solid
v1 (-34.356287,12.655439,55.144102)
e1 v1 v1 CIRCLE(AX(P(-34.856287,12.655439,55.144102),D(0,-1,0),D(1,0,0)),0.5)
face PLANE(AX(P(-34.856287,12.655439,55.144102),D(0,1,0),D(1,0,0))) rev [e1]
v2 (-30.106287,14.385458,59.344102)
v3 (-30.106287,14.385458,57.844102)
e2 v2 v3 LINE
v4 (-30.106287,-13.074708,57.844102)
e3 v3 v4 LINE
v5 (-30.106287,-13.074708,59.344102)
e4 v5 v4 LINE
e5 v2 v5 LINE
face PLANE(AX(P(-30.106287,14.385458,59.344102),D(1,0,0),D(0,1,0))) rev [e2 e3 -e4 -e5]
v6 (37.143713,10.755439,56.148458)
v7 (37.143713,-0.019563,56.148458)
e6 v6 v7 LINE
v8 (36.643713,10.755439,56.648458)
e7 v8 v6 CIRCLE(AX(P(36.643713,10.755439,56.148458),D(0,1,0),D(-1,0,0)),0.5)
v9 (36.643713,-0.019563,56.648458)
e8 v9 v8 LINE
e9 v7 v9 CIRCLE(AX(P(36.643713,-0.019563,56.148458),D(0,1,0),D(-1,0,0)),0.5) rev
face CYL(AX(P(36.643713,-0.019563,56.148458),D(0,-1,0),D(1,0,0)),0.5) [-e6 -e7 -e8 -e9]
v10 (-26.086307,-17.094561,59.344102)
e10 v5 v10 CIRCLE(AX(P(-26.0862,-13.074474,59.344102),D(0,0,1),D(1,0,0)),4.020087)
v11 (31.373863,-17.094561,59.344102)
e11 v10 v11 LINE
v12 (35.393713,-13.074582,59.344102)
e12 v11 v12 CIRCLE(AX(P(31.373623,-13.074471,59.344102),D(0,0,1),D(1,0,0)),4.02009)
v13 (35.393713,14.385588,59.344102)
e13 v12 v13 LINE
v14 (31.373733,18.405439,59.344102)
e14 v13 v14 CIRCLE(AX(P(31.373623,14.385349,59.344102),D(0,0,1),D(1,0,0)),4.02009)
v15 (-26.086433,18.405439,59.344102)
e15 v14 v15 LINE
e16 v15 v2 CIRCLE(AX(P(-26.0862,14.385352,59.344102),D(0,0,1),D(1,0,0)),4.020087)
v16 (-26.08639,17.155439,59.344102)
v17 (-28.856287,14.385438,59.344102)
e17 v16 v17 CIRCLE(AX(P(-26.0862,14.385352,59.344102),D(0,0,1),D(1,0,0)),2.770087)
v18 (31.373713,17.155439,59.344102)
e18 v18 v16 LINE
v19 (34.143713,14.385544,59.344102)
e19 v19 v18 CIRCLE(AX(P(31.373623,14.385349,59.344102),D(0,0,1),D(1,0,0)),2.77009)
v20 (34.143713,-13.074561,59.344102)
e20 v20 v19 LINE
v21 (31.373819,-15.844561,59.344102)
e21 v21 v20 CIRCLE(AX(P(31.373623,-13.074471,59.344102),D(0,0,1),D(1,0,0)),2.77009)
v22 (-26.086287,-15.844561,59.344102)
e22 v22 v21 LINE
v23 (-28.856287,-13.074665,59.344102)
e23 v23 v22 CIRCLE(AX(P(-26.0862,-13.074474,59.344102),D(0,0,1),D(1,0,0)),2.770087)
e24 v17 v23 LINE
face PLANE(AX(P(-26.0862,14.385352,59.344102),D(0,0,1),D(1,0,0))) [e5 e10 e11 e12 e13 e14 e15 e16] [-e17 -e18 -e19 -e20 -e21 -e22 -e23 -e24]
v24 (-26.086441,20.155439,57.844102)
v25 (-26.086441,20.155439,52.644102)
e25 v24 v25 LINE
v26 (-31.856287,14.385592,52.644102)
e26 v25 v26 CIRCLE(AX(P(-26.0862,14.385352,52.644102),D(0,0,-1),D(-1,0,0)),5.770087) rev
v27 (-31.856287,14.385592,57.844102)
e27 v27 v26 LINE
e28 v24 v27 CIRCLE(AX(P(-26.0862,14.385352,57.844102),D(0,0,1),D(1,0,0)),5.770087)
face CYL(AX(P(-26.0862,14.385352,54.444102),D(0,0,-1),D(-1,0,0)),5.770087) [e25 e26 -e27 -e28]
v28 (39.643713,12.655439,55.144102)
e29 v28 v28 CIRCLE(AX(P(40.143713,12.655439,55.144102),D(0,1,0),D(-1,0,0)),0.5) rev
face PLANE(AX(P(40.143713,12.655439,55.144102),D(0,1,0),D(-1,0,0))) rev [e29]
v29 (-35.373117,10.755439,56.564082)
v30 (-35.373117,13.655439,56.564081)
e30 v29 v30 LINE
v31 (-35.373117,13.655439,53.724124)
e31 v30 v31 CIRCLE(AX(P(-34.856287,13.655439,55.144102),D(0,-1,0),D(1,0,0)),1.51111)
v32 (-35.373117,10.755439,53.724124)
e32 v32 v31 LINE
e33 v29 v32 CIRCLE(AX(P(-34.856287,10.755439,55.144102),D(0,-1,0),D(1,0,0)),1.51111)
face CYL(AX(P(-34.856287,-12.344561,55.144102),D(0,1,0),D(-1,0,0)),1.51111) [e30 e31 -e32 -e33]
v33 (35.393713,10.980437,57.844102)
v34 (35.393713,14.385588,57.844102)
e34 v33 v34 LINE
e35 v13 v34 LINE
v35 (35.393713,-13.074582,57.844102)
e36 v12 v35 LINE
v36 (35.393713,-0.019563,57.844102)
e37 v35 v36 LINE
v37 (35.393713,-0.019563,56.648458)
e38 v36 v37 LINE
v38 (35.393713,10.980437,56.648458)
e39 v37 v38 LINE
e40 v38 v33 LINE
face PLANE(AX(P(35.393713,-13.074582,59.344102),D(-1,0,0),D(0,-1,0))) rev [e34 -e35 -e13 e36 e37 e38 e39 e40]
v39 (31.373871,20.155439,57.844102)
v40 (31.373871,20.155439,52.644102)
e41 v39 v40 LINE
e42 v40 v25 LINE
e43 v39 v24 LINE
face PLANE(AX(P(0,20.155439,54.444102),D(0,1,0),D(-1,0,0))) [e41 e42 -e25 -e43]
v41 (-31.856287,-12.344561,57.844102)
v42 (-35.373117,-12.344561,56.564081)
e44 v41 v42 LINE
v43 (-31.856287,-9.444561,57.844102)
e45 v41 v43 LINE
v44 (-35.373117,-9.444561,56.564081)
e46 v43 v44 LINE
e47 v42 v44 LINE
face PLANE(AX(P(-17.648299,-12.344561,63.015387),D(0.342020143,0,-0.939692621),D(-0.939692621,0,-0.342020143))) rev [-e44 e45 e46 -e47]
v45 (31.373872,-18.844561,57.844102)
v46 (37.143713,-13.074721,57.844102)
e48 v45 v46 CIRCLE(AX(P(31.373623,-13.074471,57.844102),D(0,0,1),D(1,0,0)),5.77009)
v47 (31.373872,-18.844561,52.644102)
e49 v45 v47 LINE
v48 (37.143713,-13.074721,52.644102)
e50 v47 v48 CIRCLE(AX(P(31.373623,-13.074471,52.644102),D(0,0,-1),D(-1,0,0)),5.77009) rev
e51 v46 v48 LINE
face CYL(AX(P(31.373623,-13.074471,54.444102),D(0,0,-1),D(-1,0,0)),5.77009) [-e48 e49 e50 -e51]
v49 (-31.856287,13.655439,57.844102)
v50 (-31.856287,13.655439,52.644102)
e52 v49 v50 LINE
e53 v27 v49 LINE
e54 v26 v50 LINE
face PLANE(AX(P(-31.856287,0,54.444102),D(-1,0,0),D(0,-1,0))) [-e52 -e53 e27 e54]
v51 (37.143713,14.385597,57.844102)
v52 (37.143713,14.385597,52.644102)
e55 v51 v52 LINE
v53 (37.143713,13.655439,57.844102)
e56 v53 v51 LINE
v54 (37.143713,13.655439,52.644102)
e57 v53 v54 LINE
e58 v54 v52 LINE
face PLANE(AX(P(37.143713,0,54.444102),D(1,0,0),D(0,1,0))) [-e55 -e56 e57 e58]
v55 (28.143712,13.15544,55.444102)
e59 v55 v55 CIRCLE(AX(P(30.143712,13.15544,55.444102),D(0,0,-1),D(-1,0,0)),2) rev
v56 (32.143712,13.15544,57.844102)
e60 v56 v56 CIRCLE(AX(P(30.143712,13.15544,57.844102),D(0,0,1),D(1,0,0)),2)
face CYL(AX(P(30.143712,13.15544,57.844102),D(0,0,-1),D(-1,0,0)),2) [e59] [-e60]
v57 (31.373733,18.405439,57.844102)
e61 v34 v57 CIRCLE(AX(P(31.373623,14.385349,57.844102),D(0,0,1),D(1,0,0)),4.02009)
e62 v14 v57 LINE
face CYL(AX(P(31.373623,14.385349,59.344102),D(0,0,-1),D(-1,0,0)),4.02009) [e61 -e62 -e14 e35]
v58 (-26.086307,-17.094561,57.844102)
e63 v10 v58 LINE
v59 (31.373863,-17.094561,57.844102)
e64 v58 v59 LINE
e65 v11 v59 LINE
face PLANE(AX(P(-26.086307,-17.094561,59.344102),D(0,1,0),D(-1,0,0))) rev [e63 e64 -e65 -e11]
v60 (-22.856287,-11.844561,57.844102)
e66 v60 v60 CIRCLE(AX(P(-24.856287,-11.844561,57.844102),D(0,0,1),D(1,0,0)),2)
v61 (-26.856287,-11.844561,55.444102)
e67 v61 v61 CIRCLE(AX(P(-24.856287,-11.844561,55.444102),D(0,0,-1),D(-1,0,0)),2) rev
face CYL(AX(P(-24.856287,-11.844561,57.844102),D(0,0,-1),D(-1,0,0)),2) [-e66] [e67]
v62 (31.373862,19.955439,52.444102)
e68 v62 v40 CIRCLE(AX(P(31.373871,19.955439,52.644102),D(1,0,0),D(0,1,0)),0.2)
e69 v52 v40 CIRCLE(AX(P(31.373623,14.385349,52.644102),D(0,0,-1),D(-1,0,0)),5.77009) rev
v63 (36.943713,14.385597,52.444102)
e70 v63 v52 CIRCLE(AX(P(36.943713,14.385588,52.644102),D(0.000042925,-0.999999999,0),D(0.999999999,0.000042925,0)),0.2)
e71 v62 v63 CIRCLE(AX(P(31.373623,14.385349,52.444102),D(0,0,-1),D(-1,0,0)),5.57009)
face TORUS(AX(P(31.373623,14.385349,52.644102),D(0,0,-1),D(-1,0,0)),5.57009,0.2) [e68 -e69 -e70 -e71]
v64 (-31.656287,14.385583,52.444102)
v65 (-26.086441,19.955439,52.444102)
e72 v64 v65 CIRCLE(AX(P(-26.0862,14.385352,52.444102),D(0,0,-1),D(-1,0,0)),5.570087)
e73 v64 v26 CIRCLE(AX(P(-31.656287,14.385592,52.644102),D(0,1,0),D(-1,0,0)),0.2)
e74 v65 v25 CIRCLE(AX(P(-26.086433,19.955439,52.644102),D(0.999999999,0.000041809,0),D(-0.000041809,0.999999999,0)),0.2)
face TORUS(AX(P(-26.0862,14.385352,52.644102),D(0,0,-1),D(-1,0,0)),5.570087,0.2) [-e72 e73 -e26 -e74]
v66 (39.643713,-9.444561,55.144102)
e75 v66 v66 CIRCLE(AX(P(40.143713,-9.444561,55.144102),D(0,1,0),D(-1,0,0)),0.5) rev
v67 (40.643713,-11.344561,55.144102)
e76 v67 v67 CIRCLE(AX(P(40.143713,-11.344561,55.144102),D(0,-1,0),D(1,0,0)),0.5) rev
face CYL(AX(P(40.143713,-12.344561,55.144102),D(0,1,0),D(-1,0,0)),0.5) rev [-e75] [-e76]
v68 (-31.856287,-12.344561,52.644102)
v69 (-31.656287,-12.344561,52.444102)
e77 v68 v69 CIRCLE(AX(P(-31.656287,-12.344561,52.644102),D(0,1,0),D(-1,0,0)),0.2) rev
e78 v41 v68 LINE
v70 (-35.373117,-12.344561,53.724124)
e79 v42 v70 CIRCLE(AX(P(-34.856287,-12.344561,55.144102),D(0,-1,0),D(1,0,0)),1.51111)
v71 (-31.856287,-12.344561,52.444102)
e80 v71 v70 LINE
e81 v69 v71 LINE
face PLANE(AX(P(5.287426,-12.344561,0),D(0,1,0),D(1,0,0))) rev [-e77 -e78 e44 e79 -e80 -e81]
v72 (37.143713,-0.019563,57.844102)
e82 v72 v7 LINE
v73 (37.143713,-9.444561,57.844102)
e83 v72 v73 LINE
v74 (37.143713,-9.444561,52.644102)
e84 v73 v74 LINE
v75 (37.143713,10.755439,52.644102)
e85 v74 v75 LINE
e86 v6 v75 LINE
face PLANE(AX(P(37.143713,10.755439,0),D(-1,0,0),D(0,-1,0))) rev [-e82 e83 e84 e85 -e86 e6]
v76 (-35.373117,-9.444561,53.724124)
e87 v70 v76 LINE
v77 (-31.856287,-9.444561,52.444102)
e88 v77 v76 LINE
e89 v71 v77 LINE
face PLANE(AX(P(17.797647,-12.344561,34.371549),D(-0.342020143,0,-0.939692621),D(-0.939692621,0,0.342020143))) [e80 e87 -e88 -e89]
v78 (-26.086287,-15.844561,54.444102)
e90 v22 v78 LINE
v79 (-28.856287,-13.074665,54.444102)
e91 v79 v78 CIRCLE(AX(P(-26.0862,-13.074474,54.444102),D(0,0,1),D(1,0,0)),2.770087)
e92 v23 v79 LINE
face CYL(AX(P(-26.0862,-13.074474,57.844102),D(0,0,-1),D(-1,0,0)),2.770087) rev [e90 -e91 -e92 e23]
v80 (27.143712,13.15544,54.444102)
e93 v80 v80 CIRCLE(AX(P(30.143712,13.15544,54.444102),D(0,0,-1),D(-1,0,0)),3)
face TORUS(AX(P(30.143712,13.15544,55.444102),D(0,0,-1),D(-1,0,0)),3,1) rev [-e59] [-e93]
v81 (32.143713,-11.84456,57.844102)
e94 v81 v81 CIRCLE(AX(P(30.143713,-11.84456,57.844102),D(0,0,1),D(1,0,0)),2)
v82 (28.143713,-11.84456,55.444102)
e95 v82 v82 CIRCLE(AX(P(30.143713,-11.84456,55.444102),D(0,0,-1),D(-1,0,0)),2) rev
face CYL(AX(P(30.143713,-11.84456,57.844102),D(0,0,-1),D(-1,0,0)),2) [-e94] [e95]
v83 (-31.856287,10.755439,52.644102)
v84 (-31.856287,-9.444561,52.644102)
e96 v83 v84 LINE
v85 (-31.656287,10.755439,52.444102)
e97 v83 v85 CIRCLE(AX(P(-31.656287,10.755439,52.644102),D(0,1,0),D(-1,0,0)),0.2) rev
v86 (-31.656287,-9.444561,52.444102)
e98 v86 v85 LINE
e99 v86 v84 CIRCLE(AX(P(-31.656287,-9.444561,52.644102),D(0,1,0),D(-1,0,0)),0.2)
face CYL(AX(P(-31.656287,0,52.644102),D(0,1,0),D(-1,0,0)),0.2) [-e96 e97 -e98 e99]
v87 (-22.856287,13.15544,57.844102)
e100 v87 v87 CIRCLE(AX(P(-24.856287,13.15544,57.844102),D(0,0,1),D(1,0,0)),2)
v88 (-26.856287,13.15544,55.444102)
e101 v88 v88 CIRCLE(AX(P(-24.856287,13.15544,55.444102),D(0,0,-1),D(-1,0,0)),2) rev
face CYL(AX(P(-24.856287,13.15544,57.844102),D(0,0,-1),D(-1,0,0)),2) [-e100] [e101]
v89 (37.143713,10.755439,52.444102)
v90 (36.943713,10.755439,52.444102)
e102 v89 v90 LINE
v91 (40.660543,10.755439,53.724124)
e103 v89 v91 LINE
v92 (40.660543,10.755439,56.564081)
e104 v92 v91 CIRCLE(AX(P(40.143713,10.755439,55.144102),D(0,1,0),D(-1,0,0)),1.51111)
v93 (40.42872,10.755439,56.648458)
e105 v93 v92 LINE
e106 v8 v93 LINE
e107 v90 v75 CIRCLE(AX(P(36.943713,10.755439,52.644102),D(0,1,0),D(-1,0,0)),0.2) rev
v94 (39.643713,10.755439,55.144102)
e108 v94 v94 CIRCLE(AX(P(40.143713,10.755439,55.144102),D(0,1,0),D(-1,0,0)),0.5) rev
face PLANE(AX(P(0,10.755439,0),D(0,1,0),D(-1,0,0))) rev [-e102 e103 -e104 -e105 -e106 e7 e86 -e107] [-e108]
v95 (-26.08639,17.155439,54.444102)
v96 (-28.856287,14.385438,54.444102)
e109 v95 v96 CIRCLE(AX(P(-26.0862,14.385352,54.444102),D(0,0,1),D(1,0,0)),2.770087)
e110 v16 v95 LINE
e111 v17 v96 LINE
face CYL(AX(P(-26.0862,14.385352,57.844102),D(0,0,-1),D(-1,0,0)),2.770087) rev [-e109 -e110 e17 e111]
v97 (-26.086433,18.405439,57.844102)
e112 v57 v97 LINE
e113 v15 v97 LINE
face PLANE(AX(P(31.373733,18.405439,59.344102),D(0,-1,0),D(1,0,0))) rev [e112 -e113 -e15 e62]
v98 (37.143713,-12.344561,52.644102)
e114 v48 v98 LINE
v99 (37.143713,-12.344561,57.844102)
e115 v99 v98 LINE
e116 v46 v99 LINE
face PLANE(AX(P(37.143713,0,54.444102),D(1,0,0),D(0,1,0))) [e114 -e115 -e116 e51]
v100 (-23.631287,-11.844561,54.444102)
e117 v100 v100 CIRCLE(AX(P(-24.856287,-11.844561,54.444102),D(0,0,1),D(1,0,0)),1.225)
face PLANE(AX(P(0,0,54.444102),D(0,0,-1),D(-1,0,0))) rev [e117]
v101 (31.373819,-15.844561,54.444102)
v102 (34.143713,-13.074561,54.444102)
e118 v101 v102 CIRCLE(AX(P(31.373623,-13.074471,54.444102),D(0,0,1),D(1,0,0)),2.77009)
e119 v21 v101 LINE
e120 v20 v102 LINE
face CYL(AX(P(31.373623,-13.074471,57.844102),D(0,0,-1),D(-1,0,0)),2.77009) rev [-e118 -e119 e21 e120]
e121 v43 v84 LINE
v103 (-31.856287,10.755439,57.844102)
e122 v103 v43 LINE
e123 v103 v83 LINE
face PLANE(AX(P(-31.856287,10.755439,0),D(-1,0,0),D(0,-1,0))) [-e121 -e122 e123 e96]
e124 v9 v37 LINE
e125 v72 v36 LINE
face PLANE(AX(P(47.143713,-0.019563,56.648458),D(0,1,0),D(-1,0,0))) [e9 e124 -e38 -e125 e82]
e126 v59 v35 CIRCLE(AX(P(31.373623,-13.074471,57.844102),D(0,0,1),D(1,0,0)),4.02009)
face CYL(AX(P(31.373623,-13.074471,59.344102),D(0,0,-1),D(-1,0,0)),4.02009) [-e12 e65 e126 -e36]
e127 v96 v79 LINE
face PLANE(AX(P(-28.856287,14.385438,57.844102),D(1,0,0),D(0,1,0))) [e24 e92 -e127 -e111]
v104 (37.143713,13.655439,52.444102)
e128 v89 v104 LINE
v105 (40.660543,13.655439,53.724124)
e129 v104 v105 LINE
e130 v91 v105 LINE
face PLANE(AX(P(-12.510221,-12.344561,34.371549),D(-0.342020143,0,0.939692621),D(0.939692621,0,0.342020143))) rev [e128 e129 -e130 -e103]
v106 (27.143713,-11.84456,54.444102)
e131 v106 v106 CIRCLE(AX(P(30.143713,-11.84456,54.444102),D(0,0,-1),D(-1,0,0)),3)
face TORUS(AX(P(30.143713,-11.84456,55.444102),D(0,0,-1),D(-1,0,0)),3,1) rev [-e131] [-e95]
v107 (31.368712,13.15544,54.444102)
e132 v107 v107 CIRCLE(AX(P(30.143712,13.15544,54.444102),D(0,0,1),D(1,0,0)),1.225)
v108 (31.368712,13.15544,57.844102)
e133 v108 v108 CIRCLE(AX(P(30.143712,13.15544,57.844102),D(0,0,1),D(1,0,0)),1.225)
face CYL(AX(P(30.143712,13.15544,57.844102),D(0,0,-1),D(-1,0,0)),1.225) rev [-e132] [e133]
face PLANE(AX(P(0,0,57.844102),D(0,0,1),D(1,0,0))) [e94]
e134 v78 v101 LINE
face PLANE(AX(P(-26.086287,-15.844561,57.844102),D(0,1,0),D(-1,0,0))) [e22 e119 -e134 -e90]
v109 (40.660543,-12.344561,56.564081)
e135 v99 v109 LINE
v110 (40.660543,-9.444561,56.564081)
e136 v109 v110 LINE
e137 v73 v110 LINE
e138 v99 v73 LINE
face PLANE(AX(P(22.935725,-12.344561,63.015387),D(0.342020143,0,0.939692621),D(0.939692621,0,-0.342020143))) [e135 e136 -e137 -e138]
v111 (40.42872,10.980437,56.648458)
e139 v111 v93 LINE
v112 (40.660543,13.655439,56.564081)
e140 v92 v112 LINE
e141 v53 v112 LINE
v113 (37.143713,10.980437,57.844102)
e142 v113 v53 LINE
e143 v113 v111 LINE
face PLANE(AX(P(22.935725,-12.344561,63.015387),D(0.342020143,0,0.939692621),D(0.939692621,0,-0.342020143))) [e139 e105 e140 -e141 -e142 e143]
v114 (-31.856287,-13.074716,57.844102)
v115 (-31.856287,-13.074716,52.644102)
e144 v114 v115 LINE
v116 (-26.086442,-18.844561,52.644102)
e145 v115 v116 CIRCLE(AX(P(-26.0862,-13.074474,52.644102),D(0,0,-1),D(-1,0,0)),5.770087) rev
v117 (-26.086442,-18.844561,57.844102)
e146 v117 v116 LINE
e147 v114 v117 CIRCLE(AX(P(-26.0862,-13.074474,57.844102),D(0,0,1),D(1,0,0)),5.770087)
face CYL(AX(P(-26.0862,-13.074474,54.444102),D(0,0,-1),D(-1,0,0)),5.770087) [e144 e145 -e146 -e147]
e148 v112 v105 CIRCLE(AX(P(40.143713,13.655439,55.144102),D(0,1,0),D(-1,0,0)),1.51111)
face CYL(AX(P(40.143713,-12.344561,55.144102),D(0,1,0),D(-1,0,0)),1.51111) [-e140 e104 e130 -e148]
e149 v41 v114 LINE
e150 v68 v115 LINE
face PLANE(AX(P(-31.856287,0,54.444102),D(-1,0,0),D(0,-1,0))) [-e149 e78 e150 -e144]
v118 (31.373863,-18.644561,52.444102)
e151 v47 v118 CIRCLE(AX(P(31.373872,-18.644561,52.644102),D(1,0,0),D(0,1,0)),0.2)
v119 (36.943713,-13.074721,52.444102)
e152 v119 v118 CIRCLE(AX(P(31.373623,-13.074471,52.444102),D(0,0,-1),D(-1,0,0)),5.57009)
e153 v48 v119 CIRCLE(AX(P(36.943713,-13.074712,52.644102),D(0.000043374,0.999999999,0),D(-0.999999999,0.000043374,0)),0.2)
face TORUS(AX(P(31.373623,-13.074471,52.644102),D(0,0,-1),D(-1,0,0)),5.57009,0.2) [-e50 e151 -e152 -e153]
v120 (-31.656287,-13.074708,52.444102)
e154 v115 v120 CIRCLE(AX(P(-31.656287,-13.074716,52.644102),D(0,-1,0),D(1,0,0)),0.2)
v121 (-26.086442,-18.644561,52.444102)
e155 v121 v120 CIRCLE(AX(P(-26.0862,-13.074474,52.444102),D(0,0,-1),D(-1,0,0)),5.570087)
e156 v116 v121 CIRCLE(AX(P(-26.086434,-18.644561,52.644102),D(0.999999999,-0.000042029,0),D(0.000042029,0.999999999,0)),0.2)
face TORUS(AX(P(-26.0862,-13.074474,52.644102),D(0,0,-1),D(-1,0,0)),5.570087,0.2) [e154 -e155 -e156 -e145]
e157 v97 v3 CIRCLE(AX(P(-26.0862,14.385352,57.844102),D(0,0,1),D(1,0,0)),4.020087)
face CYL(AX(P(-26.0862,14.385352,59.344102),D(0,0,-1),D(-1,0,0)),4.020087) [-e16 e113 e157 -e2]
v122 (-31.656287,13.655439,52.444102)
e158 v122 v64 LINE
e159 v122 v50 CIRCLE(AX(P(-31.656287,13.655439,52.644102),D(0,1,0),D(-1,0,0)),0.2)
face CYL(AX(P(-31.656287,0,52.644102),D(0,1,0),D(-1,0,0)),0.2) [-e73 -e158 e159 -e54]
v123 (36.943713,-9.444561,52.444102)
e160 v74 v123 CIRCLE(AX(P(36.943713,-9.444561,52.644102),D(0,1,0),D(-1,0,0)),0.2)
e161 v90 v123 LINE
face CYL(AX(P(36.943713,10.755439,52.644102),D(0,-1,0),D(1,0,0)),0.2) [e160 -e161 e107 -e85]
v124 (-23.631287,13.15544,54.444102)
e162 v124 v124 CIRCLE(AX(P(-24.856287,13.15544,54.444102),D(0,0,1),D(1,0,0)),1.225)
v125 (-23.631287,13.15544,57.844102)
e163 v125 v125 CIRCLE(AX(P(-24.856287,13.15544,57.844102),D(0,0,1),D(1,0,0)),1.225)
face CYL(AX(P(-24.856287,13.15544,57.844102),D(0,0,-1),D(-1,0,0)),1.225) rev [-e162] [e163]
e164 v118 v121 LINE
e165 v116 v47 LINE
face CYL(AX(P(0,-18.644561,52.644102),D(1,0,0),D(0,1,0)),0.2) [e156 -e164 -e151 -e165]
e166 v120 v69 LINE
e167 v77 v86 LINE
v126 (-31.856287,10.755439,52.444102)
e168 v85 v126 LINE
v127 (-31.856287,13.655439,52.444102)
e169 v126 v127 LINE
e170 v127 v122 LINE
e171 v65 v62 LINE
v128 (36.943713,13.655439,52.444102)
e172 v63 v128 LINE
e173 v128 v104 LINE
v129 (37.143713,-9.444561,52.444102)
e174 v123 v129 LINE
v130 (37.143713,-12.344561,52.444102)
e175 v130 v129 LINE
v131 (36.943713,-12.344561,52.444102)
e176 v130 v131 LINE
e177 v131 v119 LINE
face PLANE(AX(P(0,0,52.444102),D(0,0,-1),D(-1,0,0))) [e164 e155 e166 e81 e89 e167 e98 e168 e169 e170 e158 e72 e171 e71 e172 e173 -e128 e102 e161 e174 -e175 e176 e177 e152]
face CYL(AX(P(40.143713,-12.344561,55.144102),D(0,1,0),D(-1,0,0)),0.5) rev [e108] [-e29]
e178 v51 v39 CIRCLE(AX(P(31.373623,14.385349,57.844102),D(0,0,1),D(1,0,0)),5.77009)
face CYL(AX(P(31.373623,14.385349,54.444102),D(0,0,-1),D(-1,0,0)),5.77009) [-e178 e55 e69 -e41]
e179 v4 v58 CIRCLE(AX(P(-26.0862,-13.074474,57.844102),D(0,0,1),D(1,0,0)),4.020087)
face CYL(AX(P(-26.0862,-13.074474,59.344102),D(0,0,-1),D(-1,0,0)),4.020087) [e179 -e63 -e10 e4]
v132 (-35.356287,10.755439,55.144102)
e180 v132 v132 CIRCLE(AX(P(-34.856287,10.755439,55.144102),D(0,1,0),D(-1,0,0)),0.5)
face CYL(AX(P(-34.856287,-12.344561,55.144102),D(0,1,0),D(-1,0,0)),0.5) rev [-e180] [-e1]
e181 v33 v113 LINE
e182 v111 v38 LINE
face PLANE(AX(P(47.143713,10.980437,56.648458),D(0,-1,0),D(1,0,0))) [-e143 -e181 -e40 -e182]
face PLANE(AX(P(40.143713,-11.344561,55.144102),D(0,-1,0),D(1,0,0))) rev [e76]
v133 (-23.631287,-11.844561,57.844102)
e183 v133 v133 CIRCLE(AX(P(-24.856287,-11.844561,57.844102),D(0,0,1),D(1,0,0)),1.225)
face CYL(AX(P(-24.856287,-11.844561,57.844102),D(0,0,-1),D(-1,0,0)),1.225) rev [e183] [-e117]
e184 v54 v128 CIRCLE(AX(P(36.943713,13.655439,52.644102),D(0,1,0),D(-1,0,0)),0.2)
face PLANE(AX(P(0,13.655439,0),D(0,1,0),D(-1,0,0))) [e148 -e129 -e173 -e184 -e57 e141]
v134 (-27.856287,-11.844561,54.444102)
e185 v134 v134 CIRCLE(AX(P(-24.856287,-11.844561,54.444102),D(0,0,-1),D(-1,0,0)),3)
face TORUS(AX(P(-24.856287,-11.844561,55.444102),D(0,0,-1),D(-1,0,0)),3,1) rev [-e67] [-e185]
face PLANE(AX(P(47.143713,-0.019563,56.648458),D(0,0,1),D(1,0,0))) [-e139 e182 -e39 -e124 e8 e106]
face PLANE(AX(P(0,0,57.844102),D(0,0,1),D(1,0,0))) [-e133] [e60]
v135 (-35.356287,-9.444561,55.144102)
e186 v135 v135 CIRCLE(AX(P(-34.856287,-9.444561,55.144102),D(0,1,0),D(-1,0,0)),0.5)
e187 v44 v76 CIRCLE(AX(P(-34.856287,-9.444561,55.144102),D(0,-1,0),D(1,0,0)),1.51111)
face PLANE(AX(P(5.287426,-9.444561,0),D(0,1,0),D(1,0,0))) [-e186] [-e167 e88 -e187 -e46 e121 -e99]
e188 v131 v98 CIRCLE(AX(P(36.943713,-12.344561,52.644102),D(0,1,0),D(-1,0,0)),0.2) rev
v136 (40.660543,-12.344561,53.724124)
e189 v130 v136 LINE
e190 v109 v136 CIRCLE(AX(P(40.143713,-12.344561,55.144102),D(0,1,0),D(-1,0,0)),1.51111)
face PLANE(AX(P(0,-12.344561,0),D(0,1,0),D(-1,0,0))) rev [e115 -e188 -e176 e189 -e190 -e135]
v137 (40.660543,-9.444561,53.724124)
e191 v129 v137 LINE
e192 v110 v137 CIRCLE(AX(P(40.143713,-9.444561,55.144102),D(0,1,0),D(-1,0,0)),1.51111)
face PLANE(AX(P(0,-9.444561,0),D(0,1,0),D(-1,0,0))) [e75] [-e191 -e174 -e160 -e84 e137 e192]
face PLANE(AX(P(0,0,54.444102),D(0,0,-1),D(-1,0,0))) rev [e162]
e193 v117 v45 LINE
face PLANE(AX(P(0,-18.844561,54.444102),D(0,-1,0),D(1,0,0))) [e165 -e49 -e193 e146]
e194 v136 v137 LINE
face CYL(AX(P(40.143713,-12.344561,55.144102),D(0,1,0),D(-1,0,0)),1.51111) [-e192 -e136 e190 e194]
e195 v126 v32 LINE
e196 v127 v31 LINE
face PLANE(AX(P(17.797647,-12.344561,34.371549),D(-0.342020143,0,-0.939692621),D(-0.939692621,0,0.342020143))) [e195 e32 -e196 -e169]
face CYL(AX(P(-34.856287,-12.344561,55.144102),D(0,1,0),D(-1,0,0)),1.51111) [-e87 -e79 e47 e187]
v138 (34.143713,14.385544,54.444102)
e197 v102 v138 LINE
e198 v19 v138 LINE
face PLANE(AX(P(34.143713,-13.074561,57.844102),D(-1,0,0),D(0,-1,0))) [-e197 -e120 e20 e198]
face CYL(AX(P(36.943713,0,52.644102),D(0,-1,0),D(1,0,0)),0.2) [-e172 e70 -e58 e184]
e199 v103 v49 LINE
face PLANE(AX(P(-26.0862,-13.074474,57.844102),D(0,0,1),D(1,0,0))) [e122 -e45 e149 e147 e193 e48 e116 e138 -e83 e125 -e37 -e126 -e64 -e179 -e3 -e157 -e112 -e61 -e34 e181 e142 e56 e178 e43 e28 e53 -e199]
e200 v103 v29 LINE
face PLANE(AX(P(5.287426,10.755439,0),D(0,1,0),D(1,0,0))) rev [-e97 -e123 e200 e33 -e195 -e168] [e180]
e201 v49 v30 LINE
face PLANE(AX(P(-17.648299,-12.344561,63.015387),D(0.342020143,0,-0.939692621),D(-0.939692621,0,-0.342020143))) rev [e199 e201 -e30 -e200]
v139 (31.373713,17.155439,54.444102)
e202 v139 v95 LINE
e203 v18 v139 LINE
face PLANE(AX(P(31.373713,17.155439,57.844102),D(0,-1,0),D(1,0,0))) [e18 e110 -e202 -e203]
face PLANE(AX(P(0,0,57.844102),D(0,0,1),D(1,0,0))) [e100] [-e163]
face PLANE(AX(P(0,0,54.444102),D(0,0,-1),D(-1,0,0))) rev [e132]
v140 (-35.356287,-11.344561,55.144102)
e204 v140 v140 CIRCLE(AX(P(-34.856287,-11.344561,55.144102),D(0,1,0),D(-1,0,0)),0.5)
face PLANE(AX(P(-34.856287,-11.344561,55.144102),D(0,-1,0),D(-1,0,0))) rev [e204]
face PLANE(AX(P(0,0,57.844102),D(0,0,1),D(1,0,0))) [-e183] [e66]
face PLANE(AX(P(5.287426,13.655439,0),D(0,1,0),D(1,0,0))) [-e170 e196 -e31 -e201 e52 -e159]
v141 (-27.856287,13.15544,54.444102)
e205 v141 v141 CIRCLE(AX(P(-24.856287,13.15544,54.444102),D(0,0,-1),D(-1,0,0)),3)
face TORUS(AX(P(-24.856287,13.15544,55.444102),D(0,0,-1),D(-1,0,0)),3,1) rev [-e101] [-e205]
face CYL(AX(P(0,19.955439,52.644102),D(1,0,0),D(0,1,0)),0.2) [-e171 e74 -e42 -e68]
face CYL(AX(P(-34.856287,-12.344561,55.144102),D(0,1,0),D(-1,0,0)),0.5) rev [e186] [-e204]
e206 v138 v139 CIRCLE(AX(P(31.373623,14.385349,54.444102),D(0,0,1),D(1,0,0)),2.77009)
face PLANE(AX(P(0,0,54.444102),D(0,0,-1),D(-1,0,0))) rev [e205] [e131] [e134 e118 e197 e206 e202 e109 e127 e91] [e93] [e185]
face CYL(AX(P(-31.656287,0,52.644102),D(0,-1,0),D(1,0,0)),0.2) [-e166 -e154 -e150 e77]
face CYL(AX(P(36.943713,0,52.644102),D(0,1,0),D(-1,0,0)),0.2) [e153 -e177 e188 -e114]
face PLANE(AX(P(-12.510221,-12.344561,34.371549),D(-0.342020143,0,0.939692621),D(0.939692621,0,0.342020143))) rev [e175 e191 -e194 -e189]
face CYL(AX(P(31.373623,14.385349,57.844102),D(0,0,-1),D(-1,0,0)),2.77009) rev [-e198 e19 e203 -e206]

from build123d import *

# Parameters (mm, degrees)
EXTRUDE_1_DEPTH                 = 2
SKETCH_2_R                      = 2
SKETCH_2_R_2                    = 1.225
EXTRUDE_2_DEPTH                 = 3.4
FILLET_1_R                      = 1
EXTRUDE_3_DEPTH                 = 3.4
EXTRUDE_4_DEPTH                 = 1.5
EXTRUDE_START                   = -13
EXTRUDE_5_OUTLINE_R             = 0.5
EXTRUDE_5_DEPTH                 = 26
SKETCH_7_R                      = 0.5
EXTRUDE_6_DEPTH                 = 1
SKETCH_6_5_R                    = 1.511110367
CUT_EXTRUDE_2_DEPTH             = 10.1
CUT_EXTRUDE_START               = -10.1
CUT_EXTRUDE_3_DEPTH             = 20.2
EXTRUDE_START_2                 = -1
SKETCH_8_R                      = 0.5
EXTRUDE_7_DEPTH                 = 1
FILLET_12_R                     = 0.2
FILLET_13_R                     = 0.2
FILLET_14_R                     = 0.2
FILLET_15_R                     = 0.2
CUT_EXTRUDE_4_REACH             = 98.601
SKETCH_9_W                      = 8
SKETCH_9_H                      = 11
CUT_EXTRUDE_4_DIRECTION_2_DEPTH = 10
FILLET_20_R                     = 0.5


# Read off the part's stored shape, not the designer's step: 填料-伸長5, 除料-伸長3
with BuildPart() as part:
    # 草圖1 → 填料-伸長1 (new body)
    # profile 1 of 2: a face of its own
    with BuildSketch(Plane(origin=(0, 0, 52.444102468), x_dir=(-1, 0, 0), z_dir=(0, 0, -1))):
        with BuildLine():
            Line((-31.373871627, -18.844561135), (26.086442071, -18.844561135))
            ThreePointArc((26.086442071, -18.844561135), (30.166267544, -17.154541644), (31.856287034, -13.074716171))
            Line((31.856287034, -13.074716171), (31.856287035, 14.385591758))
            ThreePointArc((31.856287035, 14.385591758), (30.166268145, 18.465419031), (26.08644126, 20.155438855))
            Line((26.08644126, 20.155438855), (-31.373870816, 20.155438854))
            ThreePointArc((-31.373870816, 20.155438854), (-35.453692779, 18.465418678), (-37.143712955, 14.385596715))
            Line((-37.143712955, 14.385596715), (-37.143712955, -13.074721129))
            ThreePointArc((-37.143712955, -13.074721129), (-35.453692177, -17.154541292), (-31.373871627, -18.844561135))
        make_face()
        with BuildLine():
            ThreePointArc((26.086287059, -14.34456114), (26.984287031, -13.972561131), (27.35628704, -13.074561159))
            Line((27.35628704, -13.074561159), (27.35628704, 14.385438402))
            ThreePointArc((27.35628704, 14.385438402), (26.984287334, 15.283438817), (26.086287059, 15.65543886))
            Line((26.086287059, 15.65543886), (-31.373712502, 15.65543886))
            ThreePointArc((-31.373712502, 15.65543886), (-32.271712266, 15.283438166), (-32.64371296, 14.385438402))
            Line((-32.64371296, 14.385438402), (-32.64371296, -13.074561159))
            ThreePointArc((-32.64371296, -13.074561159), (-32.271711963, -13.97256048), (-31.373712502, -14.34456114))
            Line((-31.373712502, -14.34456114), (26.086287059, -14.34456114))
        make_face(mode=Mode.SUBTRACT)
    # profile 2 of 2: a face of its own
    with BuildSketch(Plane(origin=(0, 0, 52.444102468), x_dir=(-1, 0, 0), z_dir=(0, 0, -1))):
        with BuildLine():
            Line((-31.373712502, -14.34456114), (26.086287059, -14.34456114))
            ThreePointArc((26.086287059, -14.34456114), (26.984287031, -13.972561131), (27.35628704, -13.074561159))
            Line((27.35628704, -13.074561159), (27.35628704, 14.385438402))
            ThreePointArc((27.35628704, 14.385438402), (26.984287334, 15.283438817), (26.086287059, 15.65543886))
            Line((26.086287059, 15.65543886), (-31.373712502, 15.65543886))
            ThreePointArc((-31.373712502, 15.65543886), (-32.271712266, 15.283438166), (-32.64371296, 14.385438402))
            Line((-32.64371296, 14.385438402), (-32.64371296, -13.074561159))
            ThreePointArc((-32.64371296, -13.074561159), (-32.271711963, -13.97256048), (-31.373712502, -14.34456114))
        make_face()
    extrude(amount=-EXTRUDE_1_DEPTH)

    # 草圖2 → 填料-伸長2 (add)
    # profile 1 of 4: a face of its own
    with BuildSketch(Plane.XY.offset(54.444102468)):
        with Locations(Location((-24.85628696, -11.84456106, 0), (0, 0, 180))):
            Circle(SKETCH_2_R)
        with Locations((-24.85628696, -11.84456106)):
            Circle(SKETCH_2_R_2, mode=Mode.SUBTRACT)
    # profile 2 of 4: a face of its own
    with BuildSketch(Plane.XY.offset(54.444102468)):
        with Locations(Location((-24.85628696, 13.15543974, 0), (0, 0, 180))):
            Circle(SKETCH_2_R)
        with Locations((-24.85628696, 13.15543974)):
            Circle(SKETCH_2_R_2, mode=Mode.SUBTRACT)
    # profile 3 of 4: a face of its own
    with BuildSketch(Plane.XY.offset(54.444102468)):
        with Locations(Location((30.14371226, 13.15543974, 0), (0, 0, 180))):
            Circle(SKETCH_2_R)
        with Locations((30.14371226, 13.15543974)):
            Circle(SKETCH_2_R_2, mode=Mode.SUBTRACT)
    # profile 4 of 4: a face of its own
    with BuildSketch(Plane.XY.offset(54.444102468)):
        with Locations(Location((30.14371304, -11.84456026, 0), (0, 0, 180))):
            Circle(SKETCH_2_R)
    extrude(amount=EXTRUDE_2_DEPTH)

    # 圓角1
    fillet_1_edges = [part.edges().sort_by_distance(p)[0] for p in [
        (32.14371226, 13.15543974, 54.444102468),
        (-22.85628696, 13.15543974, 54.444102468),
        (-22.85628696, -11.84456106, 54.444102468),
        (32.14371304, -11.84456026, 54.444102468),
    ]]
    fillet(fillet_1_edges, radius=FILLET_1_R)

    # 草圖4 → 填料-伸長3 (add)
    with BuildSketch(Plane.XY.offset(54.444102468)):
        with BuildLine():
            Line((-26.086442071, -18.844561135), (31.373871627, -18.844561135))
            ThreePointArc((31.373871627, -18.844561135), (35.453692178, -17.154541292), (37.143712955, -13.074721129))
            Line((37.143712955, -13.074721129), (37.143712955, 14.385596715))
            ThreePointArc((37.143712955, 14.385596715), (35.453692779, 18.465418678), (31.373870816, 20.155438854))
            Line((31.373870816, 20.155438854), (-26.08644126, 20.155438855))
            ThreePointArc((-26.08644126, 20.155438855), (-30.166268145, 18.465419031), (-31.856287035, 14.385591758))
            Line((-31.856287035, 14.385591758), (-31.856287034, -13.074716171))
            ThreePointArc((-31.856287034, -13.074716171), (-30.166267544, -17.154541644), (-26.086442071, -18.844561135))
        make_face()
        with BuildLine():
            Line((-26.086287059, -15.84456114), (31.373818586, -15.844561136))
            ThreePointArc((31.373818586, -15.844561136), (33.332409641, -15.033183146), (34.14371296, -13.074561159))
            Line((34.14371296, -13.074561159), (34.143712957, 14.385543944))
            ThreePointArc((34.143712957, 14.385543944), (33.332335123, 16.344135652), (31.373712502, 17.15543886))
            Line((31.373712502, 17.15543886), (-26.086389859, 17.155438856))
            ThreePointArc((-26.086389859, 17.155438856), (-28.044983851, 16.344062643), (-28.85628704, 14.385438402))
            Line((-28.85628704, 14.385438402), (-28.856287036, -13.074664501))
            ThreePointArc((-28.856287036, -13.074664501), (-28.044910666, -15.033257839), (-26.086287059, -15.84456114))
        make_face(mode=Mode.SUBTRACT)
    extrude(amount=EXTRUDE_3_DEPTH)

    # 草圖5 → 填料-伸長4 (add)
    with BuildSketch(Plane.XY.offset(57.844102468)):
        with BuildLine():
            Line((-30.10628704, 14.385457934), (-30.106287034, -13.07470756))
            ThreePointArc((-30.106287034, -13.07470756), (-28.928785898, -15.917149559), (-26.086306801, -17.094561141))
            Line((-26.086306801, -17.094561141), (31.373862787, -17.094561134))
            ThreePointArc((31.373862787, -17.094561134), (34.21630154, -15.917058196), (35.39371296, -13.074581533))
            Line((35.39371296, -13.074581533), (35.393712954, 14.38558792))
            ThreePointArc((35.393712954, 14.38558792), (34.216210178, 17.228027546), (31.373732665, 18.40543886))
            Line((31.373732665, 18.40543886), (-26.086432693, 18.405438854))
            ThreePointArc((-26.086432693, 18.405438854), (-28.928875564, 17.227937879), (-30.10628704, 14.385457934))
        make_face()
        with BuildLine():
            Line((-28.85628704, 14.385438402), (-28.856287036, -13.074664501))
            ThreePointArc((-28.856287036, -13.074664501), (-28.044910666, -15.033257839), (-26.086287059, -15.844561141))
            Line((-26.086287059, -15.844561141), (31.373818586, -15.844561136))
            ThreePointArc((31.373818586, -15.844561136), (33.33240964, -15.033183145), (34.143712961, -13.074561159))
            Line((34.143712961, -13.074561159), (34.143712956, 14.385543944))
            ThreePointArc((34.143712956, 14.385543944), (33.332335122, 16.344135651), (31.373712502, 17.15543886))
            Line((31.373712502, 17.15543886), (-26.086389859, 17.155438855))
            ThreePointArc((-26.086389859, 17.155438855), (-28.04498385, 16.344062642), (-28.85628704, 14.385438402))
        make_face(mode=Mode.SUBTRACT)
    extrude(amount=EXTRUDE_4_DEPTH)

    # 填料-伸長5 outline → 填料-伸長5 (add)
    with BuildSketch(Plane(origin=(0, 0.65543886, 0), x_dir=(1, 0, 0), z_dir=(0, 1, 0)).offset(EXTRUDE_START)):
        with BuildLine():
            Line((37.143712955, -52.444102468), (37.143712955, -57.844102468))
            Line((37.143712955, -57.844102468), (40.660543139, -56.564081729))
            ThreePointArc((40.660543139, -56.564081729), (41.654823322, -55.144102468), (40.660543139, -53.724123206))
            Line((40.660543139, -53.724123206), (37.143712955, -52.444102468))
        make_face()
        with Locations((40.143712955, -55.144102468)):
            Circle(EXTRUDE_5_OUTLINE_R, mode=Mode.SUBTRACT)
    extrude_5 = extrude(amount=EXTRUDE_5_DEPTH)

    # 草圖7 → 填料-伸長6 (add)
    with BuildSketch(Plane.XZ.offset(12.34456114)):
        with Locations(Location((40.143712955, 55.144102468, 0), (0, 0, 180))):
            Circle(SKETCH_7_R)
    extrude_6 = extrude(amount=-EXTRUDE_6_DEPTH)

    # 草圖6<5> → 除料-伸長2 (cut, symmetric)
    with BuildSketch(Plane(origin=(0, 0.65543886, 0), x_dir=(1, 0, 0), z_dir=(0, 1, 0))):
        with Locations((40.143712955, -55.144102468)):
            Circle(SKETCH_6_5_R)
    cut_extrude_2 = extrude(amount=CUT_EXTRUDE_2_DEPTH, both=True, mode=Mode.SUBTRACT)

    # 除料-伸長3 outline → 除料-伸長3 (cut)
    with BuildSketch(Plane(origin=(0, 0.65543886, 0), x_dir=(1, 0, 0), z_dir=(0, 1, 0)).offset(CUT_EXTRUDE_START)):
        with BuildLine():
            Line((40.660543139, -53.724123206), (37.143712955, -52.444102468))
            Line((37.143712955, -52.444102468), (37.143712955, -57.844102468))
            Line((37.143712955, -57.844102468), (40.660543139, -56.564081729))
            ThreePointArc((40.660543139, -56.564081729), (38.632602587, -55.144102468), (40.660543139, -53.724123206))
        make_face()
    cut_extrude_3 = extrude(amount=CUT_EXTRUDE_3_DEPTH, mode=Mode.SUBTRACT)

    # 草圖8 → 填料-伸長7 (add)
    with BuildSketch(Plane(origin=(0, 13.65543886, 0), x_dir=(1, 0, 0), z_dir=(0, 1, 0)).offset(EXTRUDE_START_2)):
        with Locations(Location((40.143712955, -55.144102468, 0), (0, 0, 180))):
            Circle(SKETCH_8_R)
    extrude_7 = extrude(amount=EXTRUDE_7_DEPTH)

    # 鏡射2: 填料-伸長5, 填料-伸長6, 除料-伸長2, 除料-伸長3, 填料-伸長7 across plane
    add(extrude_5.mirror(Plane.ZY.offset(-2.64371296)))
    add(extrude_6.mirror(Plane.ZY.offset(-2.64371296)))
    add(cut_extrude_2.mirror(Plane.ZY.offset(-2.64371296)), mode=Mode.SUBTRACT)
    add(cut_extrude_3.mirror(Plane.ZY.offset(-2.64371296)), mode=Mode.SUBTRACT)
    add(extrude_7.mirror(Plane.ZY.offset(-2.64371296)))

    # 圓角12
    fillet_12_edges = [part.edges().sort_by_distance(p)[0] for p in [
        (-31.856287034, -12.709638656, 52.444102468),
        (-30.166267544, -17.154541644, 52.444102468),
        (2.643714778, -18.844561135, 52.444102468),
        (37.143712955, -12.709641134, 52.444102468),
        (35.453692177, -17.154541292, 52.444102468),
    ]]
    fillet(fillet_12_edges, radius=FILLET_12_R)

    # 圓角13
    fillet_13_edges = [part.edges().sort_by_distance(p)[0] for p in [
        (37.143712955, 0.65543886, 52.444102468),
    ]]
    fillet(fillet_13_edges, radius=FILLET_13_R)

    # 圓角14
    fillet_14_edges = [part.edges().sort_by_distance(p)[0] for p in [
        (37.143712955, 14.020517788, 52.444102468),
        (35.453692779, 18.465418678, 52.444102468),
        (2.643714778, 20.155438854, 52.444102468),
        (-30.166268145, 18.465419031, 52.444102468),
        (-31.856287035, 14.020515309, 52.444102468),
    ]]
    fillet(fillet_14_edges, radius=FILLET_14_R)

    # 圓角15
    fillet_15_edges = [part.edges().sort_by_distance(p)[0] for p in [
        (-31.856287035, 0.65543886, 52.444102468),
    ]]
    fillet(fillet_15_edges, radius=FILLET_15_R)

    # 除料-伸長4: up to this face of the body (flat: up to its plane)
    cut_extrude_4_end = Plane(part.part.faces().sort_by_distance((35.393712957, 0.655503194, 58.594102468))[0])
    # 草圖9 → 除料-伸長4 (cut, up to the picked face)
    with BuildSketch(Plane(origin=(37.143712955, 0, 0), x_dir=(0, 0, -1), z_dir=(1.0, -3.597222090600559e-12, 0)), mode=Mode.PRIVATE) as cut_extrude_4_sk1:
        with Locations((-60.648457798, 5.480436611)):
            Rectangle(SKETCH_9_W, SKETCH_9_H)
    cut_extrude_4_tool1 = split(extrude(cut_extrude_4_sk1.sketch, amount=-CUT_EXTRUDE_4_REACH, mode=Mode.PRIVATE), bisect_by=cut_extrude_4_end, keep=Keep.BOTH, mode=Mode.PRIVATE)
    add(cut_extrude_4_tool1.solids().sort_by(Axis((37.143713, 5.480437, 60.648458), (-1.0, 3.597222090600559e-12, 0)))[0], mode=Mode.SUBTRACT)

    # 草圖9 → 除料-伸長4 direction 2 (cut)
    with BuildSketch(Plane(origin=(37.143712955, 0, 0), x_dir=(0, 0, -1), z_dir=(1.0, -3.597222090600559e-12, 0))):
        with Locations((-60.648457798, 5.480436611)):
            Rectangle(SKETCH_9_W, SKETCH_9_H)
    extrude(amount=CUT_EXTRUDE_4_DIRECTION_2_DEPTH, mode=Mode.SUBTRACT)

    # 圓角20
    fillet_20_edges = [part.edges().sort_by_distance(p)[0] for p in [
        (37.143712955, 5.367937735, 56.648457798),
    ]]
    fillet(fillet_20_edges, radius=FILLET_20_R)


solid = part.part
